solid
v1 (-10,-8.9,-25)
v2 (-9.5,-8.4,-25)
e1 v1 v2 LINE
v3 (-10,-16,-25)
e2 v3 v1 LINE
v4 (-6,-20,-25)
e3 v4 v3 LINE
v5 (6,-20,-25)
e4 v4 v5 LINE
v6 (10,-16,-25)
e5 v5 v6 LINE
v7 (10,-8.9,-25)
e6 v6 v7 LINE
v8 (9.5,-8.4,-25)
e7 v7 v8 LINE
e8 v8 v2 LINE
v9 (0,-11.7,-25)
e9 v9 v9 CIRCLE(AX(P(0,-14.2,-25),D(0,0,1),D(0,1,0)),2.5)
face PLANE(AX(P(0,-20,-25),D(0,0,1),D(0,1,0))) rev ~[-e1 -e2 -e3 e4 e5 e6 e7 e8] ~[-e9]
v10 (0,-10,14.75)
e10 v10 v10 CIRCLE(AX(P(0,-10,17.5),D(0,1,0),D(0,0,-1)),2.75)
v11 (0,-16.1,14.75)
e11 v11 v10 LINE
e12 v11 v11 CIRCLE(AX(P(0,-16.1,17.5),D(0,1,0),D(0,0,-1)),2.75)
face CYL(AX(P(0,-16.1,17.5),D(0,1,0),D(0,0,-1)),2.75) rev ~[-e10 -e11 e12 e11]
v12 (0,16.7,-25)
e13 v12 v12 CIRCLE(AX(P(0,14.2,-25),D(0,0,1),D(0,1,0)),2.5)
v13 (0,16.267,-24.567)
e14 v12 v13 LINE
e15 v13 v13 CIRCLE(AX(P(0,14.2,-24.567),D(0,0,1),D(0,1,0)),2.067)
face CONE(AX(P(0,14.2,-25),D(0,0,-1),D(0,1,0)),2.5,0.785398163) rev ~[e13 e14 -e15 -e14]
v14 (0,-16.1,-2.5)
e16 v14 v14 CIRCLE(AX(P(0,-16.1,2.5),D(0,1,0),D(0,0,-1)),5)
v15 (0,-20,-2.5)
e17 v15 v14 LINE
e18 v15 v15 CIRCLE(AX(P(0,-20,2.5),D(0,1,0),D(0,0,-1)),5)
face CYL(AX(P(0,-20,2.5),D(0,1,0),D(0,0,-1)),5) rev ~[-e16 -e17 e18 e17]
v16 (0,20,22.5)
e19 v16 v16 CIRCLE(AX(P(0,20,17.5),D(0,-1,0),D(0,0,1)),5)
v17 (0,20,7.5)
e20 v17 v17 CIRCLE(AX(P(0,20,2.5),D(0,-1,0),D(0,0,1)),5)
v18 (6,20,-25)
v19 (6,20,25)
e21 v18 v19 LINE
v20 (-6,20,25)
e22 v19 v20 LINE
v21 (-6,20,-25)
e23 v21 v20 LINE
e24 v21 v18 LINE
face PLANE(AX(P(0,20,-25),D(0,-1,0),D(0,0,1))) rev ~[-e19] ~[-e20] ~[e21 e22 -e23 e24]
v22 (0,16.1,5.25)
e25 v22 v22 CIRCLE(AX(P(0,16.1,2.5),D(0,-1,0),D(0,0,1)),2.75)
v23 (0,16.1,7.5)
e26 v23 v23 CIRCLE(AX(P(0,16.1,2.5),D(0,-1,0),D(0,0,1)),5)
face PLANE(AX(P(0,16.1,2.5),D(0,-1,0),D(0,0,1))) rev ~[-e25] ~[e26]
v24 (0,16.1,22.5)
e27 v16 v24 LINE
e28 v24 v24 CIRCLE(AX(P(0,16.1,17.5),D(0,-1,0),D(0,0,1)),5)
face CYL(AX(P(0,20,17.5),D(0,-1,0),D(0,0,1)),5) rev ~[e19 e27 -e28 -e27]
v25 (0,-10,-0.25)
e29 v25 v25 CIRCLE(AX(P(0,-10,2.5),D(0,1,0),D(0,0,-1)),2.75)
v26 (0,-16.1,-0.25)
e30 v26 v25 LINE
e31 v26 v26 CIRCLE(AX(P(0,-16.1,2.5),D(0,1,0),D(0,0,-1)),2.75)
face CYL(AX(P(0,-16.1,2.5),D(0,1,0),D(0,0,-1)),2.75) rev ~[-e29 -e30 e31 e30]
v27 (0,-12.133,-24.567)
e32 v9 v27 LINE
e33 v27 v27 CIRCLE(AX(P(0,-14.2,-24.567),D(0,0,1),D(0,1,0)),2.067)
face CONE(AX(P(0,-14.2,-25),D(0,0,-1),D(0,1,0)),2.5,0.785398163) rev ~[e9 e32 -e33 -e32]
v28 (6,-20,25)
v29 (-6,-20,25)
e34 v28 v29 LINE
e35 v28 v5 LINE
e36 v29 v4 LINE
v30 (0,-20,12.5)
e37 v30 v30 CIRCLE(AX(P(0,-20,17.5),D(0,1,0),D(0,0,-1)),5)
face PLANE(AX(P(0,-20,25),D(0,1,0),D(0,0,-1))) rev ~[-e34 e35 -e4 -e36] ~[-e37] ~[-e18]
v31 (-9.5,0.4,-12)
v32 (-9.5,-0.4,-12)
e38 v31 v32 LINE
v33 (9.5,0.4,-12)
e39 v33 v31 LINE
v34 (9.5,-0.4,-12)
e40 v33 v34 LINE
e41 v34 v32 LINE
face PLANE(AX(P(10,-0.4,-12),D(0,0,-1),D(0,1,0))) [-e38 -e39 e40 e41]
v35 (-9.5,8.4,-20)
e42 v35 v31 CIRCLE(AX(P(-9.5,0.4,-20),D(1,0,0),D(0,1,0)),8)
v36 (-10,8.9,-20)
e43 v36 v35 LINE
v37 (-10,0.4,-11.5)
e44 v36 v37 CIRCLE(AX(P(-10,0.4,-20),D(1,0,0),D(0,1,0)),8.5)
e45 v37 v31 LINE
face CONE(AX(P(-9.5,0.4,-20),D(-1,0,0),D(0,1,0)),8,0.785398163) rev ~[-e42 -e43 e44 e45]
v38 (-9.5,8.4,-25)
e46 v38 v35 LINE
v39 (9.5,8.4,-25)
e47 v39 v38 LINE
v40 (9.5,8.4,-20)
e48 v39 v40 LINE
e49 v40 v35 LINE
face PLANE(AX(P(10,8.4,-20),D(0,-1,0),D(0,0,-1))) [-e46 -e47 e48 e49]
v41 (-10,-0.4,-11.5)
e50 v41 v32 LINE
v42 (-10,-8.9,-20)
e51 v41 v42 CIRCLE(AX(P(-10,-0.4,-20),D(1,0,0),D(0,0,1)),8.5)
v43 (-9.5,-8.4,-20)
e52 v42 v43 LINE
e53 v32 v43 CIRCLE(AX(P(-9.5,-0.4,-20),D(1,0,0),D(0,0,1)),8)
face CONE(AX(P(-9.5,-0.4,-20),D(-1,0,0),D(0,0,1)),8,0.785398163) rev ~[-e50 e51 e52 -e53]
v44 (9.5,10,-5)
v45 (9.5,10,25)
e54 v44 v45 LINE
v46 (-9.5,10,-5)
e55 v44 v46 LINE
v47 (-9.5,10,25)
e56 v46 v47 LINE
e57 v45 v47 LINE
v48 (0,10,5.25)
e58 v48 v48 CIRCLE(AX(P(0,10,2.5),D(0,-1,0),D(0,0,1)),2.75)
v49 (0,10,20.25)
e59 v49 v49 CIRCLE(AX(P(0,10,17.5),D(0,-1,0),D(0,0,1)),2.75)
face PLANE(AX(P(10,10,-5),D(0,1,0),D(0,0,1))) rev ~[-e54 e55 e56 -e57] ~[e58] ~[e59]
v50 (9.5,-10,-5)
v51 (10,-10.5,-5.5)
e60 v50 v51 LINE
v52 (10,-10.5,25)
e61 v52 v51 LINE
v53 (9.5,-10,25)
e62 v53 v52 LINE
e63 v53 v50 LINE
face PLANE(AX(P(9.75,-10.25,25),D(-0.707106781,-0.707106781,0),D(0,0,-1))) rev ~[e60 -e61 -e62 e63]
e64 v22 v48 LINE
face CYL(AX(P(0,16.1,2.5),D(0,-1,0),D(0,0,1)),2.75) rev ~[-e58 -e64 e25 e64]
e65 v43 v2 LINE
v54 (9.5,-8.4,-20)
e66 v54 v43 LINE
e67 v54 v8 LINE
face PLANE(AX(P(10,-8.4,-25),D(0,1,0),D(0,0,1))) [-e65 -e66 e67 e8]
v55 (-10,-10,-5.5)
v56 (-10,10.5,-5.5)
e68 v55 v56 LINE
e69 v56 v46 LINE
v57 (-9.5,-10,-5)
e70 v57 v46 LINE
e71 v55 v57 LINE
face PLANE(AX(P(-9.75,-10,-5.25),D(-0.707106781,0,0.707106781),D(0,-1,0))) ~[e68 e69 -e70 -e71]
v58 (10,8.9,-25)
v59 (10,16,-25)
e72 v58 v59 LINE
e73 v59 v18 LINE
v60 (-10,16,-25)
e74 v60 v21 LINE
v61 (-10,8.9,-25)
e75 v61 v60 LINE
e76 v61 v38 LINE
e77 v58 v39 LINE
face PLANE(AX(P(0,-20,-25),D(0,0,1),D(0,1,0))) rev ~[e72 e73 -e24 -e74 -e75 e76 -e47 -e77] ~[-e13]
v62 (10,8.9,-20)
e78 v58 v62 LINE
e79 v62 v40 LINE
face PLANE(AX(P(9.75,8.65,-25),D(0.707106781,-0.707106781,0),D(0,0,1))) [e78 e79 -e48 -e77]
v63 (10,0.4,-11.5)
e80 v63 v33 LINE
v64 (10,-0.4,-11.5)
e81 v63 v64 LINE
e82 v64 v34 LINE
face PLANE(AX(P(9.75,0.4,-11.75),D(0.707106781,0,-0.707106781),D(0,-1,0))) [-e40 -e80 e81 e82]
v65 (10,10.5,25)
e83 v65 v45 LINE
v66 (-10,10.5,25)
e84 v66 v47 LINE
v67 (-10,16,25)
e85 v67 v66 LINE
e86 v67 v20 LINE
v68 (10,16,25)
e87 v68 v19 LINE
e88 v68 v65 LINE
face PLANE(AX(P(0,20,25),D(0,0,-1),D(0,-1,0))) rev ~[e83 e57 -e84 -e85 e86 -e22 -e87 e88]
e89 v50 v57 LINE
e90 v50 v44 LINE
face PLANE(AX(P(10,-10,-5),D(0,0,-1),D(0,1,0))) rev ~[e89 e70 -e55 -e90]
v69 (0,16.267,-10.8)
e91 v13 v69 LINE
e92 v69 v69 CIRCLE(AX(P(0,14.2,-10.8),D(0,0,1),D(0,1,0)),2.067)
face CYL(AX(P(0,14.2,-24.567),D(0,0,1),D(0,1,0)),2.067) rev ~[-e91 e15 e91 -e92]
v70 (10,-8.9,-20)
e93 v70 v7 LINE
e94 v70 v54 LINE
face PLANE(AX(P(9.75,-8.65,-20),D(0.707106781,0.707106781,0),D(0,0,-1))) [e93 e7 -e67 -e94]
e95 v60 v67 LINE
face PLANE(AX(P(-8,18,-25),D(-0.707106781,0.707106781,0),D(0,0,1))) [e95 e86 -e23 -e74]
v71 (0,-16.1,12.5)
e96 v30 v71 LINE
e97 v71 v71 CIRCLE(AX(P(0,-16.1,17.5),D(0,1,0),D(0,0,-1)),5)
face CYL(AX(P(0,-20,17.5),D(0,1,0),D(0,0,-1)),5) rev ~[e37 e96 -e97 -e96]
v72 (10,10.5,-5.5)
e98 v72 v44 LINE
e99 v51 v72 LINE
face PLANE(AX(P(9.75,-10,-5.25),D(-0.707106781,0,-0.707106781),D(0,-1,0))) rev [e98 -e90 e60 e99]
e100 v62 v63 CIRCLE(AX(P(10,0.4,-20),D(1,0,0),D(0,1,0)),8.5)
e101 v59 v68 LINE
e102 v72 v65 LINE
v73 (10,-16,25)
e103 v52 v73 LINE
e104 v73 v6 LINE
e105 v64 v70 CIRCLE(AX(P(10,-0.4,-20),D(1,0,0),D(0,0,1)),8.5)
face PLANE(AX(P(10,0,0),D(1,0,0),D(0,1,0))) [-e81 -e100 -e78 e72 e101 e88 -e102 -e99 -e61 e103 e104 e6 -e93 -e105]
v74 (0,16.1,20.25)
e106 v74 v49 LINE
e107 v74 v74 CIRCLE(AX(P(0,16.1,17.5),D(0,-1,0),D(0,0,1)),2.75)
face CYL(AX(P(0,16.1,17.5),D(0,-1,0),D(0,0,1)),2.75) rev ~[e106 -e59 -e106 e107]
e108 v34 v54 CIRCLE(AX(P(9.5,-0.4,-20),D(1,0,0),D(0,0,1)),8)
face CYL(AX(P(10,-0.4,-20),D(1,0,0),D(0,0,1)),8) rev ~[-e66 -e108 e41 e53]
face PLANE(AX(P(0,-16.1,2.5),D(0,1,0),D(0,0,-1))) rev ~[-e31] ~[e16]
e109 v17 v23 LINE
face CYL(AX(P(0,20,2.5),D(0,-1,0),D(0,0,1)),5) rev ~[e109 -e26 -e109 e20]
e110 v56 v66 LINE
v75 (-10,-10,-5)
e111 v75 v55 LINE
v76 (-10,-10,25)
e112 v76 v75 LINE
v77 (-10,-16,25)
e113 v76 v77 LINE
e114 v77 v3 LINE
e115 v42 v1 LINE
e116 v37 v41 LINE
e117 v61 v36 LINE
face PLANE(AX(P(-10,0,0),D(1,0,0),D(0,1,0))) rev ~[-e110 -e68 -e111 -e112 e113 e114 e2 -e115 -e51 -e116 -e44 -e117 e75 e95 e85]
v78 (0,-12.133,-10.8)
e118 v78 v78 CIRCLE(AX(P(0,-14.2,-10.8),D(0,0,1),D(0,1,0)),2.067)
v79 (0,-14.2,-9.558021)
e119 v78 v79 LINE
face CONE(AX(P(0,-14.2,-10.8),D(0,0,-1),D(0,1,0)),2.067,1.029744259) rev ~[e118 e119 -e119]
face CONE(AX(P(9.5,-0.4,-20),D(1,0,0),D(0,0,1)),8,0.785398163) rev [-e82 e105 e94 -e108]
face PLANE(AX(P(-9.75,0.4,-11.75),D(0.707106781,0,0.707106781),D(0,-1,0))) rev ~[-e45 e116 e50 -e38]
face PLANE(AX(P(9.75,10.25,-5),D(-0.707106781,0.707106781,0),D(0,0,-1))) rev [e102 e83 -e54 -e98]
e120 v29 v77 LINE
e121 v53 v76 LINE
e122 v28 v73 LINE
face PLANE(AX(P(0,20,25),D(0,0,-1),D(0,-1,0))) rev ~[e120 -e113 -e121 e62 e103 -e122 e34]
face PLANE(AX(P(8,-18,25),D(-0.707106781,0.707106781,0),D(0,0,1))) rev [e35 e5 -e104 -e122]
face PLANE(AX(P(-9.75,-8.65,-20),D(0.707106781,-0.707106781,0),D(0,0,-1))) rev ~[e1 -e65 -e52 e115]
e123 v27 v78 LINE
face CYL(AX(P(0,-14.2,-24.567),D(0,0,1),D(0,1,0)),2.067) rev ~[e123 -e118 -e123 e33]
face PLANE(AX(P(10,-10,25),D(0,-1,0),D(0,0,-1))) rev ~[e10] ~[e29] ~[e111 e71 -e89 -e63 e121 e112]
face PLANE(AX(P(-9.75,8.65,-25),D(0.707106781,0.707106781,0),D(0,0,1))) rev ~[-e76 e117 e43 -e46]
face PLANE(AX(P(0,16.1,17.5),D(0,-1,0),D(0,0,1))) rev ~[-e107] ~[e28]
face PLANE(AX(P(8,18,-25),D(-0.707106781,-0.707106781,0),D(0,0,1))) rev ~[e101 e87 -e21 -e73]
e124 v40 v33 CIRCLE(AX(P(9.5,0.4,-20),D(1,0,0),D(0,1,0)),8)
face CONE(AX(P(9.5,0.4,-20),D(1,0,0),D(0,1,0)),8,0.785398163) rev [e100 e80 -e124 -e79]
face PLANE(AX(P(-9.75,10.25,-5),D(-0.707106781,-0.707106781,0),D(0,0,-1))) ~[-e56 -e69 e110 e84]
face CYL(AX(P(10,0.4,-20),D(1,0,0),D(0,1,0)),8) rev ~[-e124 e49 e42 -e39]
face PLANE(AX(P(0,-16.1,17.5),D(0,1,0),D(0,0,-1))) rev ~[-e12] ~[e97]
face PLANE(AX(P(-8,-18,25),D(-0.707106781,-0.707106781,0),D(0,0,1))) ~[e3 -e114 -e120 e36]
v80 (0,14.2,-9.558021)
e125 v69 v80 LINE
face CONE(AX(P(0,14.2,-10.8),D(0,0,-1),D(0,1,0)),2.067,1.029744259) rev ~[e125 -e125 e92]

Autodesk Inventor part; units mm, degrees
ref_plane "YZ Plane" through (0, 0, 0) normal (1, 0, 0) x (0, 1, 0)
ref_plane "XZ Plane" through (0, 0, 0) normal (0, 1, 0) x (-1, 0, 0)
ref_plane "XY Plane" through (0, 0, 0) normal (0, 0, 1) x (1, 0, 0)
sketch "Skizze1" plane through (0, 0, 0) normal (1, 0, 0) x (0, 1, 0)
  line L0 (-28, 0) -> (28, 0) construction
  line L1 (0, 35) -> (0, -35) construction
  line L2 (-20, -25) -> (20, -25)
  line L3 (20, -25) -> (20, 25)
  line L4 (20, 25) -> (-20, 25)
  line L5 (-20, 25) -> (-20, -25)
  line L6 (-20, -25) -> (20, 25) construction
  line L7 (20, -25) -> (-20, 25) construction
  point P0 (0, 0)
  dimension "d0" = 40
  dimension "d1" = 50
extrude "Grundkörper" add sketch "Skizze1" along normal mid plane 20
sketch "Skizze2" plane through (10, 0, 0) normal (1, 0, 0) x (0, 0, -1)
  line L0 (-25, 20) -> (-25, -20) construction
  line L1 (0, -28) -> (0, 28) construction
  line L2 (-35, 0) -> (35, 0) construction
  line L3 (-25, -10) -> (5, -10)
  line L4 (5, -10) -> (5, 10)
  line L5 (5, 10) -> (-25, 10)
  line L6 (-25, 10) -> (-25, -10)
  line L7 (25, -20) -> (25, 20) construction
  line L8 (25, -8.4) -> (20, -8.4)
  line L9 (12, -0.4) -> (12, 0.4)
  line L10 (20, 8.4) -> (25, 8.4)
  line L11 (25, -8.4) -> (25, 8.4)
  arc A0 (12, -0.4) -> (20, -8.4) centre (20, -0.4) ccw
  arc A1 (20, 8.4) -> (12, 0.4) centre (20, 0.4) ccw
  point P0 (0, 0)
  dimension "d4" = 30
  dimension "d5" = 20
  dimension "d14" = 13
  dimension "d15" = 16.8
  dimension "d16" = 8
extrude "Ausschnitt" cut sketch "Skizze2" against normal through all
sketch "Skizze4" plane through (-10, -20, -25) normal (0, -1, 0) x (1, 0, 0)
  line L0 (20, 20) -> (0, 20) construction
  line L1 (20, 50) -> (0, 50) construction
  line L2 (10, 60) -> (10, -10) projected
  line L3 (0, 35) -> (20, 35) construction
  line L4 (0, 0) -> (0, 50) construction
  line L5 (20, 50) -> (20, 0) construction
  point P0 (10, 25)
  point P1 (10, 42.5)
  point P2 (10, 27.5)
  dimension "d19" = 30
  dimension "d20" = 15
  dimension "d21" = 15
hole "DIN7984_M5_Boh" at (0, -20, 17.5) at (0, -20, 2.5) direction (0, 1, 0) diameter 5.5 end up to surface counterbore diameter 10 counterbore depth 3.9
mirror "Spiegeln_DIN7984_M5_Boh" about plane through (0, 0, 0) normal (0, 1, 0) of "DIN7984_M5_Boh"
sketch "Skizze5" plane through (10, -20, -25) normal (0, 0, -1) x (-1, 0, 0)
  line L0 (0, 0) -> (20, 0) construction
  line L1 (20, 11.6) -> (0, 11.6) construction
  line L2 (20, 40) -> (0, 40) construction
  line L3 (0, 28.4) -> (20, 28.4) construction
  line L4 (10, -8) -> (10, 48) construction
  line L5 (-4, 20) -> (24, 20) construction
  line L6 (10, 11.6) -> (10, 0) construction
  point P0 (10, 20)
  point P1 (10, 5.8)
  point P2 (10, 34.2)
  dimension "d29" = 28.4
hole "M5x10" at (0, -14.2, -25) at (0, 14.2, -25) direction (0, 0, 1) diameter 4.134 depth 14.2 tip angle 118 countersink diameter 5 countersink angle 90 thread size "M5x0.8" class "6H" standard "ISO Metric profile"
sketch "Skizze" plane through (10, -20, -25) normal (0, 0, -1) x (-1, 0, 0)
  circle A0 centre (10, 5.8) radius 2.5 projected
  line L0 (20, 11.6) -> (0, 11.6) projected
  line L1 (0, 0) -> (0, 11.6) projected
  line L2 (0, 0) -> (20, 0) projected
  line L3 (20, 11.6) -> (20, 0) projected
  circle A1 centre (10, 34.2) radius 2.5 projected
  line L4 (0, 28.4) -> (20, 28.4) projected
  line L5 (20, 40) -> (20, 28.4) projected
  line L6 (20, 40) -> (0, 40) projected
  line L7 (0, 28.4) -> (0, 40) projected
  line L8 (0, 11.6) -> (0, 19.6) projected
  line L9 (0, 19.6) -> (0, 20.4) projected
  line L10 (0, 20.4) -> (0, 28.4) projected
  line L11 (20, 28.4) -> (20, 20.4) projected
  line L12 (20, 20.4) -> (20, 19.6) projected
  line L13 (20, 19.6) -> (20, 11.6) projected
  point P0 (10, 20)
chamfer "Fase_Allgemein" distance 4 angle 45 4 edges at (10, -20, 0) (-10, -20, 0) (10, 20, 0) (-10, 20, 0)
chamfer "Fase" distance 0.5 angle 45 15 edges at (10, -6.0569, -14.3431) (10, 0, -12) (10, 6.0569, -14.3431) (10, 8.4, -22.5) (10, -8.4, -22.5) (-10, 6.0569, -14.3431) (-10, 0, -12) (-10, -6.0569, -14.3431) (-10, -8.4, -22.5) (-10, 8.4, -22.5) (-10, 0, -5) (-10, 10, 10) (10, -10, 10) (10, 0, -5) (10, 10, 10)
equation "\"d20\" = 0.5 * d19"
equation "\"d21\" = 0.5 * d19"
properties part number "200-50-WHEEL-CONNECTOR-20MM-01" material "Aluminium 6061"
